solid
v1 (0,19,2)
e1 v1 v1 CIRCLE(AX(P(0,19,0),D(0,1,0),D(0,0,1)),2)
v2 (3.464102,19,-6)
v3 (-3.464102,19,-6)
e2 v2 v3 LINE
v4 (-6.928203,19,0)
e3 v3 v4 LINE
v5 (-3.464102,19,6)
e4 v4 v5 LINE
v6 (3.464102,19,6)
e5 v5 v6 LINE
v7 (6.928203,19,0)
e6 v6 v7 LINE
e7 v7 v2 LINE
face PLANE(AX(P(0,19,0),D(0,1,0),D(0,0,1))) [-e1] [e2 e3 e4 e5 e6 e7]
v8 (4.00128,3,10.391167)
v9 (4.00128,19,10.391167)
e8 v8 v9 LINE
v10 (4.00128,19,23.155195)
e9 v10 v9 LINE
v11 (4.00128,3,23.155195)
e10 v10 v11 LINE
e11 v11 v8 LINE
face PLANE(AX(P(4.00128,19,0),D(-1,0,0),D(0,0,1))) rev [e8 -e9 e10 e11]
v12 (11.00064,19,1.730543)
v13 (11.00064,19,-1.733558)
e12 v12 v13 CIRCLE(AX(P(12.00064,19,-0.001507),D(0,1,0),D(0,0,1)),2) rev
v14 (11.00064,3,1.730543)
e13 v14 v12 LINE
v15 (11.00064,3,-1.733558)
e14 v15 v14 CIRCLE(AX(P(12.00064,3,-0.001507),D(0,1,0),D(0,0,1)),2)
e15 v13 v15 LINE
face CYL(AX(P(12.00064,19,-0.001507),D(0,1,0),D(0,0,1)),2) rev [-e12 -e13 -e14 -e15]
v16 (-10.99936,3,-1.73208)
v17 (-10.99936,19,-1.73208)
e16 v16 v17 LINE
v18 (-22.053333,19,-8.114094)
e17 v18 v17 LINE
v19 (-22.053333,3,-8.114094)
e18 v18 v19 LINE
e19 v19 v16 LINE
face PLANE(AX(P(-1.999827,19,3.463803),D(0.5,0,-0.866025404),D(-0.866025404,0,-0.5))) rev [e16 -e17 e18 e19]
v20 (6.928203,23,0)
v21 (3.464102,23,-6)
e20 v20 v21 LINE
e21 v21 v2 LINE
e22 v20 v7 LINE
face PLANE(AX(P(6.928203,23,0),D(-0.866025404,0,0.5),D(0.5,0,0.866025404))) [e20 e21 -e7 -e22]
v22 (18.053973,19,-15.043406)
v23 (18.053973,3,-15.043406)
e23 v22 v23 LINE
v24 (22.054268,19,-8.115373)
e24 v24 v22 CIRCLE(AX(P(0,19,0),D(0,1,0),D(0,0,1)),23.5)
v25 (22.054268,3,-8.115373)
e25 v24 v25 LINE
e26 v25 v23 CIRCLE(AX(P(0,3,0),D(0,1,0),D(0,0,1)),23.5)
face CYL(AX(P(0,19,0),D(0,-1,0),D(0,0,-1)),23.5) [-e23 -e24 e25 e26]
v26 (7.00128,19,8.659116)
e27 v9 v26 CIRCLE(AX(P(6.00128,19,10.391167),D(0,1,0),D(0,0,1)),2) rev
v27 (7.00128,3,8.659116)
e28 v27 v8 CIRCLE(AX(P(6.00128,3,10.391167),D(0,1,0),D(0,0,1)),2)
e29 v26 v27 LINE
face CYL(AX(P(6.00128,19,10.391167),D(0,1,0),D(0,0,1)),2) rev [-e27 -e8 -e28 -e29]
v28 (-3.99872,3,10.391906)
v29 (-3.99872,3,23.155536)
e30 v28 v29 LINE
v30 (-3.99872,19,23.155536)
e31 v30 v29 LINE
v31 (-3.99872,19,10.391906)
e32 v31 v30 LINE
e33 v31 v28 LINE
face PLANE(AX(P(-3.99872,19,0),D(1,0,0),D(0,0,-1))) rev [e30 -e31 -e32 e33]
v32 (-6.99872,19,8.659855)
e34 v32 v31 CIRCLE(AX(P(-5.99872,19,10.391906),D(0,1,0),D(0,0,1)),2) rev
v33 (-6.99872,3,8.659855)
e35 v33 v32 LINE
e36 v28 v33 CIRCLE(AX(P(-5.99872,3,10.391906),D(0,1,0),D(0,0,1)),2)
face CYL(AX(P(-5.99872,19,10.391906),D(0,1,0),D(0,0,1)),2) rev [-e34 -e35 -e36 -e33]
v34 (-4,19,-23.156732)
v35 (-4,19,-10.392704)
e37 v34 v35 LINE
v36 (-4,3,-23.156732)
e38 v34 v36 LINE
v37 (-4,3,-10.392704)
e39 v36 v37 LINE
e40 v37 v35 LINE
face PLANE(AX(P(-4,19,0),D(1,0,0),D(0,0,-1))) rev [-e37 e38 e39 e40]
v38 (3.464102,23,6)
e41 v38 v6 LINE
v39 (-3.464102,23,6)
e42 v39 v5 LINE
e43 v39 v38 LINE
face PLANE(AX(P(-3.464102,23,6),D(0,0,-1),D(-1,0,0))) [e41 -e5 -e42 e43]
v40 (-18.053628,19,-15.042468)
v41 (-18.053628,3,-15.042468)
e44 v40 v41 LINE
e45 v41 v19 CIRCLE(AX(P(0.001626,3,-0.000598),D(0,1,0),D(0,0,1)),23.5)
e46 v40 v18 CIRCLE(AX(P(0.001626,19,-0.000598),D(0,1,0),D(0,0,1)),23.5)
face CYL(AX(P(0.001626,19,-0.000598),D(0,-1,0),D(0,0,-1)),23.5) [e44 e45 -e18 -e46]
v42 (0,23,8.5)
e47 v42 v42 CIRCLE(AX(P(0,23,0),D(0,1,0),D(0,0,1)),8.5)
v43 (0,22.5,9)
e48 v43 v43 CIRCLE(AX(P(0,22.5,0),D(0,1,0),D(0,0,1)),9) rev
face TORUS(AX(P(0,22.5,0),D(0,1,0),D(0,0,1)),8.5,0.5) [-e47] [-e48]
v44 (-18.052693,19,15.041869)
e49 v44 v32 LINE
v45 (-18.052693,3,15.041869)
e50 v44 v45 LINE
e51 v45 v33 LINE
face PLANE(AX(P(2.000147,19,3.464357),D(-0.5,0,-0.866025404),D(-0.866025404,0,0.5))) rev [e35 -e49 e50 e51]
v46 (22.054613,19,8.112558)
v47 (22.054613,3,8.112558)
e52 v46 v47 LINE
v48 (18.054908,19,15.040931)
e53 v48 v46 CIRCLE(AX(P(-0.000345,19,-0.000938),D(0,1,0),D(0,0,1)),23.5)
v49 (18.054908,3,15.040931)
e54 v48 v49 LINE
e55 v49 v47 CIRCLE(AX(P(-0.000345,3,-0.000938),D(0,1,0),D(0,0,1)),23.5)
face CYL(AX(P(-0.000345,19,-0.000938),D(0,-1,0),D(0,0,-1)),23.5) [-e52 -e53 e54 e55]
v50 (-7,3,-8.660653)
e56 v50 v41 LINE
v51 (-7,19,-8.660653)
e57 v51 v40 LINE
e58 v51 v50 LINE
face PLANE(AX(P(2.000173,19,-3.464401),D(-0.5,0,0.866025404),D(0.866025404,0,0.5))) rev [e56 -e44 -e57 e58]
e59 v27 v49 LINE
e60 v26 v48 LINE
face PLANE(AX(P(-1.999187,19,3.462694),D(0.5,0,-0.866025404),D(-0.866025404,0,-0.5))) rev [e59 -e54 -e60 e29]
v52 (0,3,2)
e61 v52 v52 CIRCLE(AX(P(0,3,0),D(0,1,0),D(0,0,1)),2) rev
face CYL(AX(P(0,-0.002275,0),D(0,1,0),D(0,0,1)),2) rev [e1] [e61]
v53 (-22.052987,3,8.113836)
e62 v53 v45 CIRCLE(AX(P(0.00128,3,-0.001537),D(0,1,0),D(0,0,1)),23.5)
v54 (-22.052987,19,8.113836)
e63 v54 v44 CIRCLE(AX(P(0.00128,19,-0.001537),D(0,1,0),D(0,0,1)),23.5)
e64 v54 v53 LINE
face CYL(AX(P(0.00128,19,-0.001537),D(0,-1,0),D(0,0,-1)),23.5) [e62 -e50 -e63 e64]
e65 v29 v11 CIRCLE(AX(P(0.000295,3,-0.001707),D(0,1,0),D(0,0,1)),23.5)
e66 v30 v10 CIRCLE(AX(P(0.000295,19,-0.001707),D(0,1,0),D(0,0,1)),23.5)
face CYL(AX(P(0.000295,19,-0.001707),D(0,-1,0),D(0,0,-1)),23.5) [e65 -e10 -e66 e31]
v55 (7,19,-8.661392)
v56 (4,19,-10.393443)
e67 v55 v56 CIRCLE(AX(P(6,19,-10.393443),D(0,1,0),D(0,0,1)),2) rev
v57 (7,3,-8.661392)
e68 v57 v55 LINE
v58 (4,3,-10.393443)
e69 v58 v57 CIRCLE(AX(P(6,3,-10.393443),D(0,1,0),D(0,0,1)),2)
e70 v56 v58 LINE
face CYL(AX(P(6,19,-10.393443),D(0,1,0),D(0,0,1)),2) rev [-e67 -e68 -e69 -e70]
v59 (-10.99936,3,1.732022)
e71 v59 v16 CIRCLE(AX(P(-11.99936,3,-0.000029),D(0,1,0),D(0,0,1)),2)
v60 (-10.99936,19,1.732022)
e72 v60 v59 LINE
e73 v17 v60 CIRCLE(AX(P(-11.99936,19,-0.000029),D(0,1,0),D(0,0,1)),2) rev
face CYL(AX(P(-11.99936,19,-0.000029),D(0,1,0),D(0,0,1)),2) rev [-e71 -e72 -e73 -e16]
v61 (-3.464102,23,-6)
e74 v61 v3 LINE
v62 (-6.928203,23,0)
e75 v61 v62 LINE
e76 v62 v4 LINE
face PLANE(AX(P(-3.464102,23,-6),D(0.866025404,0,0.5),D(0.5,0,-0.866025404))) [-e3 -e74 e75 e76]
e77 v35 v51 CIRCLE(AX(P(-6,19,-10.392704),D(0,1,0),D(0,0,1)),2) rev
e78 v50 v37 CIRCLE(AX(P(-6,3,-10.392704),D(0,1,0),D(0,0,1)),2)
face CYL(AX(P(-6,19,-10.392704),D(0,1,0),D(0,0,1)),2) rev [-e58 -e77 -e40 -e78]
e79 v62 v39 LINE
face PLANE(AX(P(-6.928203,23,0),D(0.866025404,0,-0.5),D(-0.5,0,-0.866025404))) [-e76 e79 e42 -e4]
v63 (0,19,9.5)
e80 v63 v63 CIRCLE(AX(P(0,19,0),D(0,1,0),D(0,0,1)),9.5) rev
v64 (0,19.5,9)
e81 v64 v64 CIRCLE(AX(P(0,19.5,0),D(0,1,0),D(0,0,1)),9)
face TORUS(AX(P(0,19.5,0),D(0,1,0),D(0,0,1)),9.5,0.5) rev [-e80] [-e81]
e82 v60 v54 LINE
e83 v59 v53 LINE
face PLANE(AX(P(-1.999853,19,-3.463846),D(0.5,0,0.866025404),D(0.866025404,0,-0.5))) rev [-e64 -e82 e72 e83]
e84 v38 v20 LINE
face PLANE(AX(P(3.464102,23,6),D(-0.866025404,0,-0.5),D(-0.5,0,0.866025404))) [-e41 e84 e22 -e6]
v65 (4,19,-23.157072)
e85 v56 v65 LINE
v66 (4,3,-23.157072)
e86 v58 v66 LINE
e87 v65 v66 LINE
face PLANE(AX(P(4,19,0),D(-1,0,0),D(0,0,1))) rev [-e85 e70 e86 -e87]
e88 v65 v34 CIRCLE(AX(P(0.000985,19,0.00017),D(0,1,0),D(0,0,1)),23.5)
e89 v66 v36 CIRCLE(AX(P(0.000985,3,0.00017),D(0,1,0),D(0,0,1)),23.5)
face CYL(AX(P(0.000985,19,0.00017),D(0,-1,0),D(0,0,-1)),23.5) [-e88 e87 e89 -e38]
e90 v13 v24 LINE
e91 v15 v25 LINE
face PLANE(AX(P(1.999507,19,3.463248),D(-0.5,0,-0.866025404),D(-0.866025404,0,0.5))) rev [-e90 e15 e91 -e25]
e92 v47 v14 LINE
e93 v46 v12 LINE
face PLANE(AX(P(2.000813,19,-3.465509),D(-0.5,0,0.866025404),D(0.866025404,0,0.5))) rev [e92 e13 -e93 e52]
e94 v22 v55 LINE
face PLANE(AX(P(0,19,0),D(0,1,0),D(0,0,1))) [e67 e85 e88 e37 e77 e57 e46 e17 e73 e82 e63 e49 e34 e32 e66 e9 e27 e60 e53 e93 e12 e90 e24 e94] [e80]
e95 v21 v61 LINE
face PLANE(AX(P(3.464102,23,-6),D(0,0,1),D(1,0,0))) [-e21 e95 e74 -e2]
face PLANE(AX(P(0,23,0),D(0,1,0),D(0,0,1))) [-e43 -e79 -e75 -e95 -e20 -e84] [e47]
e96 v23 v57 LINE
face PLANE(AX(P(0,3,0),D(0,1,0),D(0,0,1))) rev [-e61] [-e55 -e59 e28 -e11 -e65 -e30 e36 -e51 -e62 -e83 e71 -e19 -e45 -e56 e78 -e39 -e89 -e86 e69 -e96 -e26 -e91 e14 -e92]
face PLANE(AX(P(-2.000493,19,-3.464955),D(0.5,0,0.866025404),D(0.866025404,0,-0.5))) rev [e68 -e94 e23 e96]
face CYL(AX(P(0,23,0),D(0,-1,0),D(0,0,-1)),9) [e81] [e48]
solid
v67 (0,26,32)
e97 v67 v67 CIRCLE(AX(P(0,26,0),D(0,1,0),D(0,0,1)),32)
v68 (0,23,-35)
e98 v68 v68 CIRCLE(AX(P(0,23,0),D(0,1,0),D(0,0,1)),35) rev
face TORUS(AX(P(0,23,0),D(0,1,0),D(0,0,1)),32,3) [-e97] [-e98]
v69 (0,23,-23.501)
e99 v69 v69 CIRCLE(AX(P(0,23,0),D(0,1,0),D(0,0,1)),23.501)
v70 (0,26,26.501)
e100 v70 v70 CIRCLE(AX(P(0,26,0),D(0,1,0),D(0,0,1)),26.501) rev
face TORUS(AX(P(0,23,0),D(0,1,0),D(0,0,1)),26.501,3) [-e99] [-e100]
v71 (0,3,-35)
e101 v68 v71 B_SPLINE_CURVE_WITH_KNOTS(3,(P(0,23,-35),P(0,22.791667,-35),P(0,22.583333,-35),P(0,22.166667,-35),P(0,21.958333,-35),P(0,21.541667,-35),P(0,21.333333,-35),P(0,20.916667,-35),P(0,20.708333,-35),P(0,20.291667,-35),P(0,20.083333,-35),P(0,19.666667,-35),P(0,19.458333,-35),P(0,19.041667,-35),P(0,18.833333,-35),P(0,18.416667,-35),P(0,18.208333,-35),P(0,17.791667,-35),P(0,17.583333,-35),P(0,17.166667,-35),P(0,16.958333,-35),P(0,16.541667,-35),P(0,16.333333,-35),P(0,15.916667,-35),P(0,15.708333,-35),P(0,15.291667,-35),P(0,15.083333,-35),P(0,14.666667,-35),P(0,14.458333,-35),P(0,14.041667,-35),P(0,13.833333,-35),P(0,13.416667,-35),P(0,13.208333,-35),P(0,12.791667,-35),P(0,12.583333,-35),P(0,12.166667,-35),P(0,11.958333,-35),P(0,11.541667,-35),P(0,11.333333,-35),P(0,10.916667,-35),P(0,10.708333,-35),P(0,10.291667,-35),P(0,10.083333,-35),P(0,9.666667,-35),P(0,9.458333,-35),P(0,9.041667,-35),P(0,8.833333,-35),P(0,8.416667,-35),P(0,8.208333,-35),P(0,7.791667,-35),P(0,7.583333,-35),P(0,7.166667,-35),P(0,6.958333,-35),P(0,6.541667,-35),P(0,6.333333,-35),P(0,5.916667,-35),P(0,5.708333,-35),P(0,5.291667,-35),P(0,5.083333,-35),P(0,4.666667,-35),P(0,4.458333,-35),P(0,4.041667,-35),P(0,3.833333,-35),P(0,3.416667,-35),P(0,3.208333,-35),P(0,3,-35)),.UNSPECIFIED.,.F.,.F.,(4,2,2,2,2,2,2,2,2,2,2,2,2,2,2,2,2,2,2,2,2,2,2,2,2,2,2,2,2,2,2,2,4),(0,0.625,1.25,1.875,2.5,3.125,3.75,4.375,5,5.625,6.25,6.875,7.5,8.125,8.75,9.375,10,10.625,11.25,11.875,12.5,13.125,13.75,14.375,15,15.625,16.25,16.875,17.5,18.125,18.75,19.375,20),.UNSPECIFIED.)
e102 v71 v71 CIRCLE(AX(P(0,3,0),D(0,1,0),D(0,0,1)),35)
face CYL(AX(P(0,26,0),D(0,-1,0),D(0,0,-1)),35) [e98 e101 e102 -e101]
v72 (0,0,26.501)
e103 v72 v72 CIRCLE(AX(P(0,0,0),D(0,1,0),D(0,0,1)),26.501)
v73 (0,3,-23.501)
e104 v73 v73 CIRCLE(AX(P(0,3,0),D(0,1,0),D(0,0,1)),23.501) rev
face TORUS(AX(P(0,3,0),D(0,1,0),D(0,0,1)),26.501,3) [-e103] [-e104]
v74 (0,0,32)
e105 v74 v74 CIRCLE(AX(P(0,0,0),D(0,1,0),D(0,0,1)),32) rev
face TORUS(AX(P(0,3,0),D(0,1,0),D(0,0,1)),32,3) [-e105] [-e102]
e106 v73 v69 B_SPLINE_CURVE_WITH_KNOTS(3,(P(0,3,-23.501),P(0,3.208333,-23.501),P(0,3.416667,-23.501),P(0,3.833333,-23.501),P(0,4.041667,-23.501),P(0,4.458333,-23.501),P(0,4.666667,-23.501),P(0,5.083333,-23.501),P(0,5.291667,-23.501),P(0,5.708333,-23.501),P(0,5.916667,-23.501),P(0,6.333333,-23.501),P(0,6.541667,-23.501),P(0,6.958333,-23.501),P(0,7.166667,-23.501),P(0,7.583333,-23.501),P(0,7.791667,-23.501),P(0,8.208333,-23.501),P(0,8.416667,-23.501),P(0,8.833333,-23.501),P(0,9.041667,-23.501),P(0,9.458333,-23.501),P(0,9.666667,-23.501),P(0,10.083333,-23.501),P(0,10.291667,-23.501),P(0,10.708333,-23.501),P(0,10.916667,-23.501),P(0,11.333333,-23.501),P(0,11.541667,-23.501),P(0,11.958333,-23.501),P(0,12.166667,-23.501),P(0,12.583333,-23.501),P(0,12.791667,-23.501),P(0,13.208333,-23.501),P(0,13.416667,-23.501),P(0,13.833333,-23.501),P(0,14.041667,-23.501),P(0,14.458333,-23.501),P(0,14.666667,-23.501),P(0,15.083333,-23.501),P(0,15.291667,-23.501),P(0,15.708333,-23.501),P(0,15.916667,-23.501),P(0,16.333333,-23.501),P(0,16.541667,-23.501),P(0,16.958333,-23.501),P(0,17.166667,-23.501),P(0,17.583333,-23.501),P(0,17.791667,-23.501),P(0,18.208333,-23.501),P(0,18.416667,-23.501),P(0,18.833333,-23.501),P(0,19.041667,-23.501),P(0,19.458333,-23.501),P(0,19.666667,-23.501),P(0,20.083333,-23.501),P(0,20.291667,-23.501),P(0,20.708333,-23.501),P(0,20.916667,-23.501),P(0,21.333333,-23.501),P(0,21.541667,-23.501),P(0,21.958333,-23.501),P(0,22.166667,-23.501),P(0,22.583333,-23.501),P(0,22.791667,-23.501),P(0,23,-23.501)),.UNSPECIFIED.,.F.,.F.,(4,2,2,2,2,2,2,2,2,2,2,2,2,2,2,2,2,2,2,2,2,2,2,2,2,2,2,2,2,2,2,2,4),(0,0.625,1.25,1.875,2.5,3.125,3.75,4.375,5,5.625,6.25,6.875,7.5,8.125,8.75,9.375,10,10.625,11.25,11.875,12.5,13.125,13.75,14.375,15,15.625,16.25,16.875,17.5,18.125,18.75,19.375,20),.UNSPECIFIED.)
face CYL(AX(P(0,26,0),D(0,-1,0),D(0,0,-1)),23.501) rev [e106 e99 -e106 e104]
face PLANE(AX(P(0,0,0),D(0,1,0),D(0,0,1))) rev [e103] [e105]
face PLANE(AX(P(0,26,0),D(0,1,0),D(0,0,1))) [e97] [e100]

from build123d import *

# Parameters (mm, degrees)
EXTRUDE_1_DEPTH         = 19
SKETCH_2_R              = 35
SKETCH_2_R_2            = 23.501
EXTRUDE_2_DEPTH         = 26
SKETCH_3_R              = 9
EXTRUDE_3_DEPTH         = 4
SKETCH_4_R              = 2
CUT_EXTRUDE_1_DEPTH     = 54.018864567
CUT_EXTRUDE_2_OUTLINE_R = 2
CUT_EXTRUDE_2_DEPTH     = 3
FILLET_1_R              = 3
FILLET_2_R              = 2
FILLET_4_R              = 0.5


# Read off the part's stored shape, not the designer's step: 凸台-拉伸1, 切除-拉伸2
with BuildPart() as part:
    # 凸台-拉伸1 outline → 凸台-拉伸1 (new body)
    with BuildSketch(Plane(origin=(0, 0, 0), x_dir=(1, 0, 0), z_dir=(0, 1, 0))):
        with BuildLine():
            ThreePointArc((-22.052987429, -8.113836459), (-20.349816777, -11.749329428), (-18.052692611, -15.041869475))
            Line((-18.052692611, -15.041869475), (-3.998719808, -6.927804495))
            Line((-3.998719808, -6.927804495), (-3.998719808, -23.155535764))
            ThreePointArc((-3.998719808, -23.155535764), (0.001294785, -23.498293197), (4.001280192, -23.155195337))
            Line((4.001280192, -23.155195337), (4.001280192, -6.927065376))
            Line((4.001280192, -6.927065376), (18.054907717, -15.04093101))
            ThreePointArc((18.054907717, -15.04093101), (20.351751657, -11.748195474), (22.054612898, -8.112557567))
            Line((22.054612898, -8.112557567), (8.000640096, 0.001507414))
            Line((8.000640096, 0.001507414), (22.054267621, 8.115373049))
            ThreePointArc((22.054267621, 8.115373049), (20.351096969, 11.750866018), (18.053972802, 15.043406065))
            Line((18.053972802, 15.043406065), (4, 6.929341085))
            Line((4, 6.929341085), (4, 23.157072354))
            ThreePointArc((4, 23.157072354), (-1.4593e-05, 23.499829787), (-4, 23.156731927))
            Line((-4, 23.156731927), (-4, 6.928601966))
            Line((-4, 6.928601966), (-18.053627525, 15.0424676))
            ThreePointArc((-18.053627525, 15.0424676), (-20.350471465, 11.749732064), (-22.053332706, 8.114094157))
            Line((-22.053332706, 8.114094157), (-7.999359904, 2.9176e-05))
            Line((-7.999359904, 2.9176e-05), (-22.052987429, -8.113836459))
        make_face()
    extrude(amount=EXTRUDE_1_DEPTH)

    # 草图3 → 凸台-拉伸3 (add)
    with BuildSketch(Plane(origin=(0, 19, 0), x_dir=(1, 0, 0), z_dir=(0, 1, 0))):
        with Locations(Location((0, 0, 0), (0, 0, 63.612200039))):
            Circle(SKETCH_3_R)
        Polygon((3.464101615, -6), (6.92820323, 0), (3.464101615, 6), (-3.464101615, 6), (-6.92820323, 0), (-3.464101615, -6), align=None, mode=Mode.SUBTRACT)
    extrude(amount=EXTRUDE_3_DEPTH)

    # 草图4 → 切除-拉伸1 (cut, through all)
    with BuildSketch(Plane(origin=(0, 19, 0), x_dir=(1, 0, 0), z_dir=(0, 1, 0))):
        with Locations(Location((0, 0, 0), (0, 0, 270))):
            Circle(SKETCH_4_R)
    extrude(amount=-CUT_EXTRUDE_1_DEPTH, mode=Mode.SUBTRACT)

    # 切除-拉伸2 outline → 切除-拉伸2 (cut)
    with BuildSketch(Plane(origin=(0, 0, 0), x_dir=(1, 0, 0), z_dir=(0, 1, 0))):
        with BuildLine():
            ThreePointArc((-22.052987429, -8.113836459), (-20.349816777, -11.749329428), (-18.052692611, -15.041869475))
            Line((-18.052692611, -15.041869475), (-3.998719808, -6.927804495))
            Line((-3.998719808, -6.927804495), (-3.998719808, -23.155535764))
            ThreePointArc((-3.998719808, -23.155535764), (0.001294785, -23.498293197), (4.001280192, -23.155195337))
            Line((4.001280192, -23.155195337), (4.001280192, -6.927065376))
            Line((4.001280192, -6.927065376), (18.054907717, -15.04093101))
            ThreePointArc((18.054907717, -15.04093101), (20.351751657, -11.748195474), (22.054612898, -8.112557567))
            Line((22.054612898, -8.112557567), (8.000640096, 0.001507414))
            Line((8.000640096, 0.001507414), (22.054267621, 8.115373049))
            ThreePointArc((22.054267621, 8.115373049), (20.351096969, 11.750866018), (18.053972802, 15.043406065))
            Line((18.053972802, 15.043406065), (4, 6.929341085))
            Line((4, 6.929341085), (4, 23.157072354))
            ThreePointArc((4, 23.157072354), (-1.4593e-05, 23.499829787), (-4, 23.156731927))
            Line((-4, 23.156731927), (-4, 6.928601966))
            Line((-4, 6.928601966), (-18.053627525, 15.0424676))
            ThreePointArc((-18.053627525, 15.0424676), (-20.350471465, 11.749732064), (-22.053332706, 8.114094157))
            Line((-22.053332706, 8.114094157), (-7.999359904, 2.9176e-05))
            Line((-7.999359904, 2.9176e-05), (-22.052987429, -8.113836459))
        make_face()
        Circle(CUT_EXTRUDE_2_OUTLINE_R, mode=Mode.SUBTRACT)
    extrude(amount=CUT_EXTRUDE_2_DEPTH, mode=Mode.SUBTRACT)

    # 圆角2
    # the kernel refuses this fillet: 2 mm, written as the material it adds along each edge
    with BuildSketch(Plane(origin=(-4, 3, -6.928601966), x_dir=(-0.8660254038017692, 0, -0.4999999999699828), z_dir=(0, 1, 0)), Plane(origin=(4, 3, -6.929341085), x_dir=(0, 0, -1), z_dir=(0, 1, 0)), Plane(origin=(8.000640096, 3, -0.001507414), x_dir=(0.8660254037750857, 0, -0.5000000000161998), z_dir=(0, 1, 0)), Plane(origin=(4.001280192, 3, 6.927065376), x_dir=(0.8660254038017693, 0, 0.4999999999699826), z_dir=(0, 1, 0)), Plane(origin=(-7.999359904, 3, -2.9176e-05), x_dir=(-0.8660254037750857, 0, 0.5000000000161998), z_dir=(0, 1, 0)), Plane(origin=(-3.998719808, 3, 6.927804495), x_dir=(0, 0, 1), z_dir=(0, 1, 0))) as fillet_2_piece_1:
        with BuildLine():
            CenterArc((FILLET_2_R * 1.7320508075, -FILLET_2_R), FILLET_2_R, 90, 119.999999998)
            Line((FILLET_2_R * 0.866025403698, -FILLET_2_R * 1.49999999997), (0, 0))
            Line((0, 0), (FILLET_2_R * 1.7320508075, 0))
        make_face()
    extrude(amount=16)

    # 圆角4
    fillet_4_edges = [part.edges().sort_by_distance(p)[0] for p in [
        (-4, 19, 8.062257748),
        (-4, 23, 8.062257748),
    ]]
    fillet(fillet_4_edges, radius=FILLET_4_R)


with BuildPart() as body_2:
    # 草图2 → 凸台-拉伸2 (new body)
    with BuildSketch(Plane(origin=(0, 0, 0), x_dir=(1, 0, 0), z_dir=(0, 1, 0))):
        with Locations(Location((0, 0, 0), (0, 0, 90))):
            Circle(SKETCH_2_R)
        with Locations(Location((0, 0, 0), (0, 0, 90))):
            Circle(SKETCH_2_R_2, mode=Mode.SUBTRACT)
    extrude(amount=EXTRUDE_2_DEPTH)

    # 圆角1
    fillet_1_edges = [body_2.edges().sort_by_distance(p)[0] for p in [
        (0, 0, 35),
        (0, 26, 35),
        (0, 0, 23.501),
        (0, 26, 23.501),
    ]]
    fillet(fillet_1_edges, radius=FILLET_1_R)


solid = Compound([part.part, body_2.part])
